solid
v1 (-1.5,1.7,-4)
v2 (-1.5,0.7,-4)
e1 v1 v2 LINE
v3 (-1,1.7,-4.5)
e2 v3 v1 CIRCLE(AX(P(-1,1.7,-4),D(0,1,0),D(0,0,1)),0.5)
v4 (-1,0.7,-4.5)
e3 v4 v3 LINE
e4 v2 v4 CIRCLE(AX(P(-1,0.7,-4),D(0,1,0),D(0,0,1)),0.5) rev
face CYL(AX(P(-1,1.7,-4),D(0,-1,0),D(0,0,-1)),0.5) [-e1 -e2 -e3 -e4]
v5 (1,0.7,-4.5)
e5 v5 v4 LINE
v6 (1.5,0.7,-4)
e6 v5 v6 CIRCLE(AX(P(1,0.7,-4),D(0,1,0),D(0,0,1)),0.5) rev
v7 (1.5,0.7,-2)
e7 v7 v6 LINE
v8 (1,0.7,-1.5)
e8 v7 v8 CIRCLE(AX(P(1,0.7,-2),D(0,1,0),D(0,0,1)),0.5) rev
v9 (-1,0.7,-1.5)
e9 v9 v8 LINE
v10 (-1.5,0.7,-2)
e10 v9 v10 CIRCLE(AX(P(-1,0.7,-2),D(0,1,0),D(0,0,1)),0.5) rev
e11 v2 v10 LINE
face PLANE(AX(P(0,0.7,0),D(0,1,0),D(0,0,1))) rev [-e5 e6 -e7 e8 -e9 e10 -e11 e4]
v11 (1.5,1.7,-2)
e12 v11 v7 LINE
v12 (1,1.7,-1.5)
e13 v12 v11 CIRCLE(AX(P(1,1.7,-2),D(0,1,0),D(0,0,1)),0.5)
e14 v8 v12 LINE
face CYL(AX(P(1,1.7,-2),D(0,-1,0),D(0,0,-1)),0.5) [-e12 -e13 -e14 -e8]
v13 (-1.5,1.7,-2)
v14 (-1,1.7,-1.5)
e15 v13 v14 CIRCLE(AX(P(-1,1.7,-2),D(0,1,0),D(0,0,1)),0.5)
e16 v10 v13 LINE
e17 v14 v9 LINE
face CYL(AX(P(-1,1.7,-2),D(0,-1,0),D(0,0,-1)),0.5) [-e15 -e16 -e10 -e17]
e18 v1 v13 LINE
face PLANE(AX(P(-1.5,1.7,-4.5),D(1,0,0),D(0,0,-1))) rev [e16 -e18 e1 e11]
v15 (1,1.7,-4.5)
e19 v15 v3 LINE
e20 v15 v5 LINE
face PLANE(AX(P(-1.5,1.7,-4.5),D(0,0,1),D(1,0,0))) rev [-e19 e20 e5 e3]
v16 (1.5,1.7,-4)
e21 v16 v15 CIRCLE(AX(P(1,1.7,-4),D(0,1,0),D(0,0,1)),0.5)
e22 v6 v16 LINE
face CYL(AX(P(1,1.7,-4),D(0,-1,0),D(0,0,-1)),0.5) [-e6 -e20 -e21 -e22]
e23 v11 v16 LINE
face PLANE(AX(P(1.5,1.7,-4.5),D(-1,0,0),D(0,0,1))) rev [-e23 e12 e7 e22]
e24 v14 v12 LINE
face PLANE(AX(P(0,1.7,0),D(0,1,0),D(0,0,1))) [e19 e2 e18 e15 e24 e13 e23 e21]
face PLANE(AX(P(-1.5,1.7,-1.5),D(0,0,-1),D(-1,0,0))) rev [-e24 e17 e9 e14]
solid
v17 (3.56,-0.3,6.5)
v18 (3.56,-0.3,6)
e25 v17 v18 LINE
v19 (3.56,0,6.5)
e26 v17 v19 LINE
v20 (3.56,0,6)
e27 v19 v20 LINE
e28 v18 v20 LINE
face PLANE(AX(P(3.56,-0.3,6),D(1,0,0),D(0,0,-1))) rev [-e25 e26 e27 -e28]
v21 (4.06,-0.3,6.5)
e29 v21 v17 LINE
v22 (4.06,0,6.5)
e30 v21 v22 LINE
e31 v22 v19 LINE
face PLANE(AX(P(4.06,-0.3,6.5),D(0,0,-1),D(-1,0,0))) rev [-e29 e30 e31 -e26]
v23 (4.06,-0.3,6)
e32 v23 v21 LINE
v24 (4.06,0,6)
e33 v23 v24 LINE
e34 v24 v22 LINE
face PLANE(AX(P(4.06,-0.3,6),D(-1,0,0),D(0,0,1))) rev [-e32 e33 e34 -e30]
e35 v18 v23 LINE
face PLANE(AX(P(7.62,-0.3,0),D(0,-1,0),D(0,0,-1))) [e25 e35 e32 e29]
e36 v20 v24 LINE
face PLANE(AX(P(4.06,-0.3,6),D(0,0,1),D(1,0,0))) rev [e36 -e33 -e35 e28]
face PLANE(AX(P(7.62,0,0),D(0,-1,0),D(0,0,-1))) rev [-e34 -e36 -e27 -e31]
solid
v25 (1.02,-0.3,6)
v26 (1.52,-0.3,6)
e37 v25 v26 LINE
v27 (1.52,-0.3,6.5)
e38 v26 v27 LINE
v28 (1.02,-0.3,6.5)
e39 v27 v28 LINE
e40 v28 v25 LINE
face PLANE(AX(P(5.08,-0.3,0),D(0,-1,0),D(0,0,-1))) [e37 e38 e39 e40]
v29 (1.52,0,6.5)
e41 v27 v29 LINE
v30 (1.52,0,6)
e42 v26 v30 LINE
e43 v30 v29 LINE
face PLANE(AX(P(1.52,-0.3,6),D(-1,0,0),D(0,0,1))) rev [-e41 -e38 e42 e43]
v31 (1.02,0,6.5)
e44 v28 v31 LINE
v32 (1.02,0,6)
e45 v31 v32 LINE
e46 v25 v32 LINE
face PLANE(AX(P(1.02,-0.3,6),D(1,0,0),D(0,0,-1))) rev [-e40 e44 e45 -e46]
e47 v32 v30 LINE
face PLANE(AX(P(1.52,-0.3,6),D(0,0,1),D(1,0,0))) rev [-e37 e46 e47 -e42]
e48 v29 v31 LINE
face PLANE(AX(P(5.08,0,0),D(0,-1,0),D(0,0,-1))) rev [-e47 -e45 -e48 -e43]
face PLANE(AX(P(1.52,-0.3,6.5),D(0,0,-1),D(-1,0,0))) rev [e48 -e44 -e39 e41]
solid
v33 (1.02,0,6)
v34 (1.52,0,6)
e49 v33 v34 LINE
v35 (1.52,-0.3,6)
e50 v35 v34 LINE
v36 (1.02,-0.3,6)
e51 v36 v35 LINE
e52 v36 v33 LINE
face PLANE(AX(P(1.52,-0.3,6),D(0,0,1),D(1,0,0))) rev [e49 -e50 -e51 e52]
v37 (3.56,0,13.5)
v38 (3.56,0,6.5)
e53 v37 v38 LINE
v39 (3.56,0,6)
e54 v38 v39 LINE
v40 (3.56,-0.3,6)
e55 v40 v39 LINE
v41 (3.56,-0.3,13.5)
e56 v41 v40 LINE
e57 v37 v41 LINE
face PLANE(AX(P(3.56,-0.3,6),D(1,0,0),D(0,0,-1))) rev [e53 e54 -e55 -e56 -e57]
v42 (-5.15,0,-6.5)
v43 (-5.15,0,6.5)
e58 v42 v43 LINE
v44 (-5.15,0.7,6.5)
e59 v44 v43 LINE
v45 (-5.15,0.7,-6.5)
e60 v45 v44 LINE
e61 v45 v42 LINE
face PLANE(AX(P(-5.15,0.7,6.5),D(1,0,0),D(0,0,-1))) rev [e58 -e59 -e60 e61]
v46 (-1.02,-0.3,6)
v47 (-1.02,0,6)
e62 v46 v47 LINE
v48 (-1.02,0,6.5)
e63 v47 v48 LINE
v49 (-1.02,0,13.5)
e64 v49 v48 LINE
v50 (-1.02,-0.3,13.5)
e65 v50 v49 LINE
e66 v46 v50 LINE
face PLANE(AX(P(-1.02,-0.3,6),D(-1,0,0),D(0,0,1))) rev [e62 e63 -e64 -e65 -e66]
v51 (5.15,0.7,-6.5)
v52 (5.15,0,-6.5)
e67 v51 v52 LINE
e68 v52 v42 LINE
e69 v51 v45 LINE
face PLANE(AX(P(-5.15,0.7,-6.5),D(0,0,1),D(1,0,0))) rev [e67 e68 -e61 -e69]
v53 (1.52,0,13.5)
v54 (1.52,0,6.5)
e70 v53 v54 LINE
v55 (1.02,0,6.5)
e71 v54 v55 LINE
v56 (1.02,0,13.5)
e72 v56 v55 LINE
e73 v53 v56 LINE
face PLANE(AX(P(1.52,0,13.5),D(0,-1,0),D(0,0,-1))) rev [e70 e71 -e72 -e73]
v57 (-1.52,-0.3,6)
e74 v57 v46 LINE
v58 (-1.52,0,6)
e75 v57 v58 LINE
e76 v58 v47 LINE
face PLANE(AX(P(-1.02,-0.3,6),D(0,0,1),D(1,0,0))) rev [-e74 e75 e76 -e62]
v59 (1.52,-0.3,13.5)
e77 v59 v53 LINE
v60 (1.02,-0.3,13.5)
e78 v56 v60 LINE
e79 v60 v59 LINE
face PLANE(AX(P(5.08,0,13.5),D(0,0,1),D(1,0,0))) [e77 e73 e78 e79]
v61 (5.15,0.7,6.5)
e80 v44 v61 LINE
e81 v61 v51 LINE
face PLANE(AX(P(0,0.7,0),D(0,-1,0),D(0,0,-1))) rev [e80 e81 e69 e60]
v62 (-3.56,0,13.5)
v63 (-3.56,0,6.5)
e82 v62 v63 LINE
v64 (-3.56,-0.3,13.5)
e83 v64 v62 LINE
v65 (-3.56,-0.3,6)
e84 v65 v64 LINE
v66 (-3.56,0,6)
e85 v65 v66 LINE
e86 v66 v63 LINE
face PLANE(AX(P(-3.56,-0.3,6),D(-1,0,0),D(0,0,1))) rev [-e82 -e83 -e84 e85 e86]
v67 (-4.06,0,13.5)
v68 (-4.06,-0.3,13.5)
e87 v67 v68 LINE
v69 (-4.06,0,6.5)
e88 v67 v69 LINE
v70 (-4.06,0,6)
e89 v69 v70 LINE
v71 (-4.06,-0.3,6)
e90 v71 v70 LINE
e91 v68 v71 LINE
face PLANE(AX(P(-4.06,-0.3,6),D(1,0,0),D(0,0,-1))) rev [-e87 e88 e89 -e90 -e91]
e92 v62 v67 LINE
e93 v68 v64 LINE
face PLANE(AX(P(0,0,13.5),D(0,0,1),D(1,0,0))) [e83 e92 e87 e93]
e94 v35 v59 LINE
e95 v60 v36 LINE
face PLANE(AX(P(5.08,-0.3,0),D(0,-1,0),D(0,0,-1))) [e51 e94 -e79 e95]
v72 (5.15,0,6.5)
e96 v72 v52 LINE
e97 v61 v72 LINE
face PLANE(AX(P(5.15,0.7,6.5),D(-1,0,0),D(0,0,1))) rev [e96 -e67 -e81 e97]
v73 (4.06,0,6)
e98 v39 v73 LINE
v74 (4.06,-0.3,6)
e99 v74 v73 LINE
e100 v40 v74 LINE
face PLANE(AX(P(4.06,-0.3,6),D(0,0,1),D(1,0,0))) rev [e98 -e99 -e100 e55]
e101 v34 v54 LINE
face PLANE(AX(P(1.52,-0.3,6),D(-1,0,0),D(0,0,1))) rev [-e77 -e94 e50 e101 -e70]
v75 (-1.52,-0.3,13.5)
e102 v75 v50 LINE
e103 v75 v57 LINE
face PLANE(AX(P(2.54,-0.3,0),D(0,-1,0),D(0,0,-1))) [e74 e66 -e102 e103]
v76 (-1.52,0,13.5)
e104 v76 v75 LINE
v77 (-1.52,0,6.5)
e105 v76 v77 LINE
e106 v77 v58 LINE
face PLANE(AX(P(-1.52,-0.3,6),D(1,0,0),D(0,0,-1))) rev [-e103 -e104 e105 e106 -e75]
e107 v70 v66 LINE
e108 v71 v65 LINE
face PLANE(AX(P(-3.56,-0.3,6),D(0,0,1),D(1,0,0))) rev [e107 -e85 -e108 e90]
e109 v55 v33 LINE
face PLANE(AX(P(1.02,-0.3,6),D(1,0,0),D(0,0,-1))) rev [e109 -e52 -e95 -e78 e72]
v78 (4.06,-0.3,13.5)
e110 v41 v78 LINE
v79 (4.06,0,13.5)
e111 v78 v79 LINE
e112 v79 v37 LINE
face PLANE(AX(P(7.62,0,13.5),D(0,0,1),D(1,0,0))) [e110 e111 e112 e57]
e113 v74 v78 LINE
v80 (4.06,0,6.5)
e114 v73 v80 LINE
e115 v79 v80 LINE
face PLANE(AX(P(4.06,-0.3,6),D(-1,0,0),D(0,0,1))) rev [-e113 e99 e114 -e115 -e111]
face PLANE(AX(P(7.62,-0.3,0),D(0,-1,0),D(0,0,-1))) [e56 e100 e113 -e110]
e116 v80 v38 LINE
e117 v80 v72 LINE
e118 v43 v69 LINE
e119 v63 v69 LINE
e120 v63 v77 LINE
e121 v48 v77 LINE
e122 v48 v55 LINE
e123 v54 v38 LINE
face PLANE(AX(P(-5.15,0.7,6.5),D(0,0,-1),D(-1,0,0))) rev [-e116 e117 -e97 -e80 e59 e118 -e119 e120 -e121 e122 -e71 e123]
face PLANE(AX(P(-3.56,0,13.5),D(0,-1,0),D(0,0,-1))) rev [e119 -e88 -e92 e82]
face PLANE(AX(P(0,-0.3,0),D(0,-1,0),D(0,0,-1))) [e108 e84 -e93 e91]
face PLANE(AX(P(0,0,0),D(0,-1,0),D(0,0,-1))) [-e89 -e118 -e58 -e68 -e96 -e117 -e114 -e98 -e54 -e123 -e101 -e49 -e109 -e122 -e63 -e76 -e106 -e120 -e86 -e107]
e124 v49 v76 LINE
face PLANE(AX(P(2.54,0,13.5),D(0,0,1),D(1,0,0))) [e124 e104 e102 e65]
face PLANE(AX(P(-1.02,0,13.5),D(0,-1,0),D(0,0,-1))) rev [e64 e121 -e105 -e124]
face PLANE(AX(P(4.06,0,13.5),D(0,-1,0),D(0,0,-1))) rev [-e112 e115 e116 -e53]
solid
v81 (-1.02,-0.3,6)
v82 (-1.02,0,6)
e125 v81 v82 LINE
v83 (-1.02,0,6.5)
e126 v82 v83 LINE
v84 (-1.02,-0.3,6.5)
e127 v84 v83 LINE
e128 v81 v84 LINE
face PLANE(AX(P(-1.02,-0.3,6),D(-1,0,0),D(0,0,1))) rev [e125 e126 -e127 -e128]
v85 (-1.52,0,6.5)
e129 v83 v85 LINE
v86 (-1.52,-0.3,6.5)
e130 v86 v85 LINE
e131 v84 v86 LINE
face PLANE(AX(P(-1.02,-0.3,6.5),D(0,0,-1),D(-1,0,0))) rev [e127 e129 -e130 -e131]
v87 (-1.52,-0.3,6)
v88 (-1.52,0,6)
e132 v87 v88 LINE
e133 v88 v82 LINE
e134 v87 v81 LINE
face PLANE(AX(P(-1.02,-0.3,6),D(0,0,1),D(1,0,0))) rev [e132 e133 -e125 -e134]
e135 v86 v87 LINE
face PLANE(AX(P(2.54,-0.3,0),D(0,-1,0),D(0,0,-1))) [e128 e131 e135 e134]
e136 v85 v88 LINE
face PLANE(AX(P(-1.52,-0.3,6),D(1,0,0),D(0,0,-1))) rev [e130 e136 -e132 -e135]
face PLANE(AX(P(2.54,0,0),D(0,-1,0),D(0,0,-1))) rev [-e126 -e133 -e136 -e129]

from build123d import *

# Parameters (mm, degrees)
SKETCH_1_W                   = 10.3
SKETCH_1_H                   = 13
EXTRUDE_1_DEPTH              = 0.7
SKETCH_2_W                   = 3
SKETCH_2_H                   = 3
EXTRUDE_2_DEPTH              = 1
FILLET_1_R                   = 0.5
SKETCH_3_W                   = 0.5
SKETCH_3_H                   = 0.5
EXTRUDE_3_DEPTH              = 0.3
SKETCH_4_W                   = 0.5
SKETCH_4_H                   = 0.3
EXTRUDE_4_DEPTH              = 7
PATTERN_START                = 3.56
PATTERN_LINEAR_1_OUTLINE_W   = 0.3
PATTERN_LINEAR_1_OUTLINE_H   = 0.5
PATTERN_LINEAR_1_DEPTH       = 0.5
PATTERN_START_2              = 1.02
PATTERN_LINEAR_1_2_OUTLINE_W = 0.3
PATTERN_LINEAR_1_2_OUTLINE_H = 0.5
PATTERN_LINEAR_1_2_DEPTH     = 0.5
PATTERN_START_3              = -1.52
PATTERN_LINEAR_1_3_OUTLINE_W = 0.3
PATTERN_LINEAR_1_3_OUTLINE_H = 0.5
PATTERN_LINEAR_1_3_DEPTH     = 0.5
PATTERN_START_4              = 6
PATTERN_LINEAR_1_4_OUTLINE_W = 0.5
PATTERN_LINEAR_1_4_OUTLINE_H = 0.3
PATTERN_LINEAR_1_4_DEPTH     = 7.5


# Read off the part's stored shape, not the designer's step: Линейный массив1
with BuildPart() as part:
    # Эскиз1 → Бобышка-Вытянуть1 (new body)
    with BuildSketch(Plane(origin=(0, 0, 0), x_dir=(1, 0, 0), z_dir=(0, 1, 0))):
        Rectangle(SKETCH_1_W, SKETCH_1_H)
    extrude(amount=EXTRUDE_1_DEPTH)



with BuildPart() as body_2:
    # Эскиз2 → Бобышка-Вытянуть2 (new body)
    with BuildSketch(Plane(origin=(0, 0.7, 0), x_dir=(1, 0, 0), z_dir=(0, 1, 0))):
        with Locations((0, 3)):
            Rectangle(SKETCH_2_W, SKETCH_2_H)
    extrude(amount=EXTRUDE_2_DEPTH)

    # Скругление1
    fillet_1_edges = [body_2.edges().sort_by_distance(p)[0] for p in [
        (1.5, 1.2, -1.5),
        (-1.5, 1.2, -1.5),
        (-1.5, 1.2, -4.5),
        (1.5, 1.2, -4.5),
    ]]
    fillet(fillet_1_edges, radius=FILLET_1_R)


with BuildPart() as body_3:
    # Эскиз3 → Бобышка-Вытянуть3 (new body)
    with BuildSketch(Plane.XZ):
        with Locations((-3.81, 6.25)):
            Rectangle(SKETCH_3_W, SKETCH_3_H)
    extrude(amount=EXTRUDE_3_DEPTH)


with BuildPart() as part_1:
    add(part.part)

    add(body_3.part)  # Бобышка-Вытянуть4 merges body 3
    # Эскиз4 → Бобышка-Вытянуть4 (add)
    with BuildSketch(Plane.XY.offset(6.5)):
        with Locations((-3.81, -0.15)):
            Rectangle(SKETCH_4_W, SKETCH_4_H)
    extrude(amount=EXTRUDE_4_DEPTH)

    # Pattern Linear 1 4 outline → Pattern Linear 1 4 (add)
    with BuildSketch(Plane.XY.offset(PATTERN_START_4)):
        with Locations((-1.27, -0.15)):
            Rectangle(PATTERN_LINEAR_1_4_OUTLINE_W, PATTERN_LINEAR_1_4_OUTLINE_H)
        with Locations((1.27, -0.15)):
            Rectangle(PATTERN_LINEAR_1_4_OUTLINE_W, PATTERN_LINEAR_1_4_OUTLINE_H)
        with Locations((3.81, -0.15)):
            Rectangle(PATTERN_LINEAR_1_4_OUTLINE_W, PATTERN_LINEAR_1_4_OUTLINE_H)
    extrude(amount=PATTERN_LINEAR_1_4_DEPTH)


with BuildPart() as body_3_2:
    # Линейный массив1 outline → Линейный массив1 (new body)
    with BuildSketch(Plane.YZ.offset(PATTERN_START)):
        with Locations((-0.15, 6.25)):
            Rectangle(PATTERN_LINEAR_1_OUTLINE_W, PATTERN_LINEAR_1_OUTLINE_H)
    extrude(amount=PATTERN_LINEAR_1_DEPTH)


with BuildPart() as body_4:
    # Pattern Linear 1 2 outline → Pattern Linear 1 2 (new body)
    with BuildSketch(Plane.YZ.offset(PATTERN_START_2)):
        with Locations((-0.15, 6.25)):
            Rectangle(PATTERN_LINEAR_1_2_OUTLINE_W, PATTERN_LINEAR_1_2_OUTLINE_H)
    extrude(amount=PATTERN_LINEAR_1_2_DEPTH)


with BuildPart() as body_5:
    # Pattern Linear 1 3 outline → Pattern Linear 1 3 (new body)
    with BuildSketch(Plane.YZ.offset(PATTERN_START_3)):
        with Locations((-0.15, 6.25)):
            Rectangle(PATTERN_LINEAR_1_3_OUTLINE_W, PATTERN_LINEAR_1_3_OUTLINE_H)
    extrude(amount=PATTERN_LINEAR_1_3_DEPTH)


solid = Compound([body_2.part, part_1.part, body_3_2.part, body_4.part, body_5.part])
